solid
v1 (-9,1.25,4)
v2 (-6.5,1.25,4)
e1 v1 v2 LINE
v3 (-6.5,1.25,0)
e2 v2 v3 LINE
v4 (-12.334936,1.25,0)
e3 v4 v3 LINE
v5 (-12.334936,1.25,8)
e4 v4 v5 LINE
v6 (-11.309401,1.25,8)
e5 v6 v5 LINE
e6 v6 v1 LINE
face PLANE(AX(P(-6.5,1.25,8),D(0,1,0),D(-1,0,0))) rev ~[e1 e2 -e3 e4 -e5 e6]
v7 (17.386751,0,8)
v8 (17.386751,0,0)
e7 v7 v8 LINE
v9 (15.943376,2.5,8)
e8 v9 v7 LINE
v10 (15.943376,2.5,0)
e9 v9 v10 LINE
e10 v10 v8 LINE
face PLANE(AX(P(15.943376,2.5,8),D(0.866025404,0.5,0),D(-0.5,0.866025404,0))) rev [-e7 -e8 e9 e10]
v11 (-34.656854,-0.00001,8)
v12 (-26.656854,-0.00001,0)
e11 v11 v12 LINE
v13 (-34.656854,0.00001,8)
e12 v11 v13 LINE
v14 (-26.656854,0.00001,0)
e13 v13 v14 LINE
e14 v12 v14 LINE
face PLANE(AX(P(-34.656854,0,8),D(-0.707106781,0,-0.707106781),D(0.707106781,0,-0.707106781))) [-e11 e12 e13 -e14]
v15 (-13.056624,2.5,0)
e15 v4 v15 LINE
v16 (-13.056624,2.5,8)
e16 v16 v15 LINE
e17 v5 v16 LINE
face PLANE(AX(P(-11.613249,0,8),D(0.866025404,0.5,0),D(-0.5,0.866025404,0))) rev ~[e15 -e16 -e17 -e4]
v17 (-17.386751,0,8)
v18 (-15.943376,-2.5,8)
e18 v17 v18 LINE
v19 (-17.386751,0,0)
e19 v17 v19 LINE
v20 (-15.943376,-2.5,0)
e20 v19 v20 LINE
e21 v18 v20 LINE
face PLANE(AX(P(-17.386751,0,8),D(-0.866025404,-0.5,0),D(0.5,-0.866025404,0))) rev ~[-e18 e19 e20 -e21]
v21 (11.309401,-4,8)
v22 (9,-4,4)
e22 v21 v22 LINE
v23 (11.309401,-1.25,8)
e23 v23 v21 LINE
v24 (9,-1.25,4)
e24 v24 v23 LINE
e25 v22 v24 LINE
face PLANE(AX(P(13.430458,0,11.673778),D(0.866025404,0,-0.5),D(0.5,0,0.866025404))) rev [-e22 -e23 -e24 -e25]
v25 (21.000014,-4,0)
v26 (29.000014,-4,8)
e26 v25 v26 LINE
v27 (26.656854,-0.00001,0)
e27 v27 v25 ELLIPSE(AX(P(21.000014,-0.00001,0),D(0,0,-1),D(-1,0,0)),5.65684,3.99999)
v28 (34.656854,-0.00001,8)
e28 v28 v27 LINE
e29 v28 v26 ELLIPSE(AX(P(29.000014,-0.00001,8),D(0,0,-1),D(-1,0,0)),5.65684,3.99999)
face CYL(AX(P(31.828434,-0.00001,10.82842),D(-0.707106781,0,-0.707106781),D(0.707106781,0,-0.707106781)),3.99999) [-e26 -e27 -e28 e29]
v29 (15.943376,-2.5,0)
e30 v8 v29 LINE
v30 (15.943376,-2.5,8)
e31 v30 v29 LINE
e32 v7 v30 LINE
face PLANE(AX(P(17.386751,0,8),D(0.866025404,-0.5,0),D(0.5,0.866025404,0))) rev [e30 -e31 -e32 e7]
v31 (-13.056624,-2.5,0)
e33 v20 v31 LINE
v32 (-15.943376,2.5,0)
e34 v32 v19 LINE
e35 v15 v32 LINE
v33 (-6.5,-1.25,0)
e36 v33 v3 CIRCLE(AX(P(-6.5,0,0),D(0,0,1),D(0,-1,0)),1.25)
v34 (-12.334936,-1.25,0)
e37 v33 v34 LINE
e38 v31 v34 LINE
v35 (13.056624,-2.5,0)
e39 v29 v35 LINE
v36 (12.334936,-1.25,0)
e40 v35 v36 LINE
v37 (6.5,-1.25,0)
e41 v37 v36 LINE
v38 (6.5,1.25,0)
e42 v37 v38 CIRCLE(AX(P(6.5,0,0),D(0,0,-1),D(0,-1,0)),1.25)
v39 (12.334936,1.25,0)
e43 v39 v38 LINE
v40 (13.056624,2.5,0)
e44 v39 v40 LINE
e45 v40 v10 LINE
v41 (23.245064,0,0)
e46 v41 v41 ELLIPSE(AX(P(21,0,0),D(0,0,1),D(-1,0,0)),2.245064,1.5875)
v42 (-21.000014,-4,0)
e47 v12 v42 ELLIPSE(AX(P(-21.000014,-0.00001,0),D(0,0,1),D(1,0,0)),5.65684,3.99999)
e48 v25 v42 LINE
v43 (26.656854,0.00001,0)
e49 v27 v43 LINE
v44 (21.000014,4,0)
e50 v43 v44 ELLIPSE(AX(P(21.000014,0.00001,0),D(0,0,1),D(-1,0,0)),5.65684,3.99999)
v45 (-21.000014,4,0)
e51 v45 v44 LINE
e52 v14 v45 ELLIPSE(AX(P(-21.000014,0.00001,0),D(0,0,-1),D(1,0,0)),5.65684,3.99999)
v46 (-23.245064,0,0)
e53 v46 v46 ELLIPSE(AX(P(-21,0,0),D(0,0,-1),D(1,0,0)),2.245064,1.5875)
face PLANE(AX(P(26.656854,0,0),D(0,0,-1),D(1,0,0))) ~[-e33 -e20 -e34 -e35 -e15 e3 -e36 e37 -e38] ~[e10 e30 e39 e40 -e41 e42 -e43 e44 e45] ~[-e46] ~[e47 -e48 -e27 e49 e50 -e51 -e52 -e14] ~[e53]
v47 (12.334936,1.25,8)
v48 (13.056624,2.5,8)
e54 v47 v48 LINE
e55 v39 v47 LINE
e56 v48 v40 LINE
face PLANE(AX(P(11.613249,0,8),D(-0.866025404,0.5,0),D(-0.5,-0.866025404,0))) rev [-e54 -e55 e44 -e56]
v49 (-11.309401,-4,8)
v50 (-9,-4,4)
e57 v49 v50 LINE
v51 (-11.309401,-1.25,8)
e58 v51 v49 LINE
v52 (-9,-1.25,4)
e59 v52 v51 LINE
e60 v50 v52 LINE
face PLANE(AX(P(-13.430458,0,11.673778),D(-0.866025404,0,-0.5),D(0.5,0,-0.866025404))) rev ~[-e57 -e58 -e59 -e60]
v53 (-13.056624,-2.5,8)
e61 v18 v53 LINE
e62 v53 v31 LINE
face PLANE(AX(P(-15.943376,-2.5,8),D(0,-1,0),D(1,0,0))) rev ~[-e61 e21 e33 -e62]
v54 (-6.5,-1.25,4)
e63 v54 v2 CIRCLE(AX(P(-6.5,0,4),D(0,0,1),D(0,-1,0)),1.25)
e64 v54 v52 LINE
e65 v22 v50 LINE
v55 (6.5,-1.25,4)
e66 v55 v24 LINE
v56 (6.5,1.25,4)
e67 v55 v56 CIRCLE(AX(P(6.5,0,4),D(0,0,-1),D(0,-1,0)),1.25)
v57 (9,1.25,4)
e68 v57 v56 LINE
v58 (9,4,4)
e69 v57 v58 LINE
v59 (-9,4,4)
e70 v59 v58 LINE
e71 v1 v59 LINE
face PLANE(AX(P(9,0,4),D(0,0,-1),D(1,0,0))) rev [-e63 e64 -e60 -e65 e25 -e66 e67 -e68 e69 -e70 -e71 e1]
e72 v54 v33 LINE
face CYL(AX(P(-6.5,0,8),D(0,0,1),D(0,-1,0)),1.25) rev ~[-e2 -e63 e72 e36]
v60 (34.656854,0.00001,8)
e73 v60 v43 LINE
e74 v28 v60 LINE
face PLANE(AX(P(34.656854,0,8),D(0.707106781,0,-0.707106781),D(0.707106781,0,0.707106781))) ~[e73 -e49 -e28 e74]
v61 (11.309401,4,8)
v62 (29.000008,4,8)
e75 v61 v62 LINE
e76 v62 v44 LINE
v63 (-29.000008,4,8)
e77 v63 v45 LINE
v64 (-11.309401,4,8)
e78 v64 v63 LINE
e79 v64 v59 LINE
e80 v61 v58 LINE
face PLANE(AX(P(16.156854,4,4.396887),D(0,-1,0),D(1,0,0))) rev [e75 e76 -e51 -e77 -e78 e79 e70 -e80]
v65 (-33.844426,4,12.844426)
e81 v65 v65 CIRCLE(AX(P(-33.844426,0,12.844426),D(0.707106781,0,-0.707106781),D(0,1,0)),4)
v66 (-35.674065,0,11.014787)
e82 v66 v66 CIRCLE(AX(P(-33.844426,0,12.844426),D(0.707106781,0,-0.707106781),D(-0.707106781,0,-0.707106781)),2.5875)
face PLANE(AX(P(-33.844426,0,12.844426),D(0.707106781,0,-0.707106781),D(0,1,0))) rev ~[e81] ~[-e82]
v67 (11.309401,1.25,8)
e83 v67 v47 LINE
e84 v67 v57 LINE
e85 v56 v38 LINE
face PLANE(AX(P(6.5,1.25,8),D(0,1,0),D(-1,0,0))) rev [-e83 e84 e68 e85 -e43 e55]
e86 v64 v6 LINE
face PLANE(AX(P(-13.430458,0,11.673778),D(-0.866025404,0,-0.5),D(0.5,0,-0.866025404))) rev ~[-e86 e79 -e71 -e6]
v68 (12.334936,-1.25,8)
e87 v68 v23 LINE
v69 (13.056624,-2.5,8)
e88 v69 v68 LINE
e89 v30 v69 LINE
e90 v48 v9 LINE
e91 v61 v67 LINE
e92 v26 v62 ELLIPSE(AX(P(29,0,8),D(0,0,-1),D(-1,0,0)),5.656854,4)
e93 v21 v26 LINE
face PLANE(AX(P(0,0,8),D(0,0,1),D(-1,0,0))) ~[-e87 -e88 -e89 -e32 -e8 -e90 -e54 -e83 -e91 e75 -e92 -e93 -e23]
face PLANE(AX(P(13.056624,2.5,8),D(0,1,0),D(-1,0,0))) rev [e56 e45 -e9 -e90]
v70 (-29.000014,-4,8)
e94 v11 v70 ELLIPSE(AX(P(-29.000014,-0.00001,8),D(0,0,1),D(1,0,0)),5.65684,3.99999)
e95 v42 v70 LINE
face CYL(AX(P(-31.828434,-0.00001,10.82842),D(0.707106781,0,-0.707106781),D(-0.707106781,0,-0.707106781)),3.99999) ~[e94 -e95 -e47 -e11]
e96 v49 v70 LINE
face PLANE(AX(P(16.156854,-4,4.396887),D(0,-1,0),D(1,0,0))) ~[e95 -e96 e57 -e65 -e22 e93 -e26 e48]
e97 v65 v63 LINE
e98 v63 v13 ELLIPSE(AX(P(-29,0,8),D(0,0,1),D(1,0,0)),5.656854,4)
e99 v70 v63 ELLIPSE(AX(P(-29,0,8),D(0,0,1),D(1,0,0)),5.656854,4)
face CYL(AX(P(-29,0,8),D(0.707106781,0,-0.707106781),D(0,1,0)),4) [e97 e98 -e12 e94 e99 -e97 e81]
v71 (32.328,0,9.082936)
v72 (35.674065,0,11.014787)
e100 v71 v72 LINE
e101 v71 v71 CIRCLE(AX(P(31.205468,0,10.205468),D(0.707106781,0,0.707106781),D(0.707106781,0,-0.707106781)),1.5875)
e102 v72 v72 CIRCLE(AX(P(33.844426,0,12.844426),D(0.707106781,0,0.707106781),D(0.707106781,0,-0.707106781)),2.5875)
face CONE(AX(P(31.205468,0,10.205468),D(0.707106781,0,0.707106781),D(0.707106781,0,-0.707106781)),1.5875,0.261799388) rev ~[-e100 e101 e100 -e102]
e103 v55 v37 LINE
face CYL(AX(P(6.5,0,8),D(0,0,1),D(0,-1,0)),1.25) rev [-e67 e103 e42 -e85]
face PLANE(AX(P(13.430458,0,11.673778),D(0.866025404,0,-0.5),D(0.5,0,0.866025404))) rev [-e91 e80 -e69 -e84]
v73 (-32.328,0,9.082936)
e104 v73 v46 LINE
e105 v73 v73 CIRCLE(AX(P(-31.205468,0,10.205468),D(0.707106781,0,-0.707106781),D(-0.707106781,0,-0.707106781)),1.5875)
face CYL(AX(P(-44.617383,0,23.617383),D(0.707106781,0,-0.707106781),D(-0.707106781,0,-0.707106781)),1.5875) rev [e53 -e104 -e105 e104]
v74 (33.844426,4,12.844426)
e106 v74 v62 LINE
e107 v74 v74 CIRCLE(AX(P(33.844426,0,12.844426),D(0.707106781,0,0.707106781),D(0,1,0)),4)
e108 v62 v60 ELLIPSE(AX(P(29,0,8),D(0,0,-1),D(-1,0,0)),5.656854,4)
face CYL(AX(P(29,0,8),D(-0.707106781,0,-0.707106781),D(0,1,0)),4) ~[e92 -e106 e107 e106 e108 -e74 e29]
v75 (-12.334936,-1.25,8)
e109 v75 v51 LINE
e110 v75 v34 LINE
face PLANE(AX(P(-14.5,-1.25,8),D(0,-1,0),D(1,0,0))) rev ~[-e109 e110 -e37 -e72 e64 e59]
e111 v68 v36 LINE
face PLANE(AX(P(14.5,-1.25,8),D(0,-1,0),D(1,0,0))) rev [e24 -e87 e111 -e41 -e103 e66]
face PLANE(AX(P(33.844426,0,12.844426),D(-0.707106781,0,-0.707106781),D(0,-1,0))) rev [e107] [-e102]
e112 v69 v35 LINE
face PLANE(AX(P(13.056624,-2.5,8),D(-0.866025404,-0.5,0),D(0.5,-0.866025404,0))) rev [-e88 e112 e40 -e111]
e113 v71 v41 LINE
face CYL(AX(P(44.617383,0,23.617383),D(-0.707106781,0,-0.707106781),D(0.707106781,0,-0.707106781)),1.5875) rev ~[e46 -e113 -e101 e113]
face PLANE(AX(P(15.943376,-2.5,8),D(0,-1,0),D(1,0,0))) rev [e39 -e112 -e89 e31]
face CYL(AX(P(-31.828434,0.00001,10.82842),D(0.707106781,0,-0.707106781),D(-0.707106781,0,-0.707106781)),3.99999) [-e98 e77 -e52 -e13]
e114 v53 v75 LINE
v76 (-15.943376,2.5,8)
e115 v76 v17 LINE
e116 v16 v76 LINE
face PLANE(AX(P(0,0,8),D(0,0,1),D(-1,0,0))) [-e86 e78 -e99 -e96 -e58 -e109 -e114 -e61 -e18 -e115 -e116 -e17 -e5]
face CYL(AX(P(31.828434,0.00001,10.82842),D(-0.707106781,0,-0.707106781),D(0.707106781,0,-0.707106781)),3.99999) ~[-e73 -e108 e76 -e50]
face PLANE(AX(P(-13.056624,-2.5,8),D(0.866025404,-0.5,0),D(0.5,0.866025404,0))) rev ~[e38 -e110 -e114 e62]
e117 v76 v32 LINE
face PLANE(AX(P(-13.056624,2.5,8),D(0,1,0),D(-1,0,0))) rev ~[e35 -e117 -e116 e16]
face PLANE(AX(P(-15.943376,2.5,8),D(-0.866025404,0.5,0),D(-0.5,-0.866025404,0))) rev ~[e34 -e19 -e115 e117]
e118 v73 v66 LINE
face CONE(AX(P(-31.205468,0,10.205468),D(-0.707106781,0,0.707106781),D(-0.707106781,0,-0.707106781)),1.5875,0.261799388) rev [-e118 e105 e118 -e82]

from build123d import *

# Parameters (mm, degrees)
F1_DEPTH  = 4
F2_R      = 3.99999
F4_DEPTH  = 8
F6_DEPTH  = 12.5
F9_R      = 4
F10_DEPTH = 6.851053331
F12_SIZE2 = 1
F12_SIZE  = 3.7320508076
F14_DEPTH = 8.001


# Not quite as in the source:
# - a fillet or chamfer is up to 0.001 mm smaller than in the source, because OpenCascade refuses the exact size


with BuildPart() as f1:
    # F0 (on Front) → F1 (new body, symmetric)
    with BuildSketch(Plane.XZ):
        Polygon((-26.6568542495, 0), (0, 0), (0, 8), (-34.6568542495, 8), align=None)
    extrude(amount=F1_DEPTH, both=True)

    # F2 (radius 4 in the source; OpenCascade refuses exactly that, so slightly less here)
    f2_edges = [f1.edges().sort_by_distance(p)[0] for p in [
        (-30.656854, 4, 4),
        (-30.656854, -4, 4),
    ]]
    fillet(f2_edges, radius=F2_R)

    # F3 (on face) → F4 (cut, through all)
    with BuildSketch(Plane.XY.offset(8)):
        Polygon((-11.6132486541, 0), (-13.056624327, 2.5), (-15.943375673, 2.5), (-17.3867513459, 0), (-15.943375673, -2.5), (-13.056624327, -2.5), align=None)
    extrude(amount=-F4_DEPTH, mode=Mode.SUBTRACT)

    # F5 (on Front) → F6 (cut, symmetric)
    with BuildSketch(Plane.XZ):
        Polygon((0, 4), (0, 11.6737775235), (-13.4304575189, 11.6737775235), (-9, 4), align=None)
    extrude(amount=F6_DEPTH, both=True, mode=Mode.SUBTRACT)

    # F9 (on line) → F10 (join, symmetric)
    with BuildSketch(Plane(origin=(-18.5, 0, 18.5), x_dir=(0, 1, 0), z_dir=(0.7071067812, 0, -0.7071067812))):
        with Locations((0, -14.8492424049)):
            Circle(F9_R)
    extrude(amount=F10_DEPTH, both=True)

    # F7 (on Front) → F11 (revolve, cut)
    with BuildSketch(Plane.XZ):
        Polygon((-11.4302859145, -11.8147781158), (-10.3077538993, -10.6922461007), (-44.6173825807, 23.6173825807), (-45.7399145958, 22.4948505656), align=None)
    revolve(axis=Axis((-27.46256824, 0, 6.46256824), (-0.7071067812, 0, 0.7071067812)), mode=Mode.SUBTRACT)

    # F12
    f12_edges = [f1.edges().sort_by_distance(p)[0] for p in [
        (-32.721894, 0, 13.966958),
    ]]
    f12_side = f1.faces().sort_by_distance((-25.685621, 0, 6.930685))[0]
    chamfer(f12_edges, length=F12_SIZE, length2=F12_SIZE2, reference=f12_side)

    # F13 (on face) → F14 (cut, through all)
    with BuildSketch(Plane.XY.offset(8)):
        with BuildLine():
            ThreePointArc((-14.5, 1.25), (-15.75, 0), (-14.5, -1.25))
            Line((-14.5, -1.25), (-6.5, -1.25))
            ThreePointArc((-6.5, -1.25), (-5.25, 0), (-6.5, 1.25))
            Line((-6.5, 1.25), (-14.5, 1.25))
        make_face()
    extrude(amount=-F14_DEPTH, mode=Mode.SUBTRACT)

    # F15: F1 across face


with BuildPart() as f1_1:
    add(f1.part)
    add(f1.part.mirror(Plane(origin=(0, 0, 2), x_dir=(0, 1, 0), z_dir=(1, 0, 0))))


solid = f1_1.part
